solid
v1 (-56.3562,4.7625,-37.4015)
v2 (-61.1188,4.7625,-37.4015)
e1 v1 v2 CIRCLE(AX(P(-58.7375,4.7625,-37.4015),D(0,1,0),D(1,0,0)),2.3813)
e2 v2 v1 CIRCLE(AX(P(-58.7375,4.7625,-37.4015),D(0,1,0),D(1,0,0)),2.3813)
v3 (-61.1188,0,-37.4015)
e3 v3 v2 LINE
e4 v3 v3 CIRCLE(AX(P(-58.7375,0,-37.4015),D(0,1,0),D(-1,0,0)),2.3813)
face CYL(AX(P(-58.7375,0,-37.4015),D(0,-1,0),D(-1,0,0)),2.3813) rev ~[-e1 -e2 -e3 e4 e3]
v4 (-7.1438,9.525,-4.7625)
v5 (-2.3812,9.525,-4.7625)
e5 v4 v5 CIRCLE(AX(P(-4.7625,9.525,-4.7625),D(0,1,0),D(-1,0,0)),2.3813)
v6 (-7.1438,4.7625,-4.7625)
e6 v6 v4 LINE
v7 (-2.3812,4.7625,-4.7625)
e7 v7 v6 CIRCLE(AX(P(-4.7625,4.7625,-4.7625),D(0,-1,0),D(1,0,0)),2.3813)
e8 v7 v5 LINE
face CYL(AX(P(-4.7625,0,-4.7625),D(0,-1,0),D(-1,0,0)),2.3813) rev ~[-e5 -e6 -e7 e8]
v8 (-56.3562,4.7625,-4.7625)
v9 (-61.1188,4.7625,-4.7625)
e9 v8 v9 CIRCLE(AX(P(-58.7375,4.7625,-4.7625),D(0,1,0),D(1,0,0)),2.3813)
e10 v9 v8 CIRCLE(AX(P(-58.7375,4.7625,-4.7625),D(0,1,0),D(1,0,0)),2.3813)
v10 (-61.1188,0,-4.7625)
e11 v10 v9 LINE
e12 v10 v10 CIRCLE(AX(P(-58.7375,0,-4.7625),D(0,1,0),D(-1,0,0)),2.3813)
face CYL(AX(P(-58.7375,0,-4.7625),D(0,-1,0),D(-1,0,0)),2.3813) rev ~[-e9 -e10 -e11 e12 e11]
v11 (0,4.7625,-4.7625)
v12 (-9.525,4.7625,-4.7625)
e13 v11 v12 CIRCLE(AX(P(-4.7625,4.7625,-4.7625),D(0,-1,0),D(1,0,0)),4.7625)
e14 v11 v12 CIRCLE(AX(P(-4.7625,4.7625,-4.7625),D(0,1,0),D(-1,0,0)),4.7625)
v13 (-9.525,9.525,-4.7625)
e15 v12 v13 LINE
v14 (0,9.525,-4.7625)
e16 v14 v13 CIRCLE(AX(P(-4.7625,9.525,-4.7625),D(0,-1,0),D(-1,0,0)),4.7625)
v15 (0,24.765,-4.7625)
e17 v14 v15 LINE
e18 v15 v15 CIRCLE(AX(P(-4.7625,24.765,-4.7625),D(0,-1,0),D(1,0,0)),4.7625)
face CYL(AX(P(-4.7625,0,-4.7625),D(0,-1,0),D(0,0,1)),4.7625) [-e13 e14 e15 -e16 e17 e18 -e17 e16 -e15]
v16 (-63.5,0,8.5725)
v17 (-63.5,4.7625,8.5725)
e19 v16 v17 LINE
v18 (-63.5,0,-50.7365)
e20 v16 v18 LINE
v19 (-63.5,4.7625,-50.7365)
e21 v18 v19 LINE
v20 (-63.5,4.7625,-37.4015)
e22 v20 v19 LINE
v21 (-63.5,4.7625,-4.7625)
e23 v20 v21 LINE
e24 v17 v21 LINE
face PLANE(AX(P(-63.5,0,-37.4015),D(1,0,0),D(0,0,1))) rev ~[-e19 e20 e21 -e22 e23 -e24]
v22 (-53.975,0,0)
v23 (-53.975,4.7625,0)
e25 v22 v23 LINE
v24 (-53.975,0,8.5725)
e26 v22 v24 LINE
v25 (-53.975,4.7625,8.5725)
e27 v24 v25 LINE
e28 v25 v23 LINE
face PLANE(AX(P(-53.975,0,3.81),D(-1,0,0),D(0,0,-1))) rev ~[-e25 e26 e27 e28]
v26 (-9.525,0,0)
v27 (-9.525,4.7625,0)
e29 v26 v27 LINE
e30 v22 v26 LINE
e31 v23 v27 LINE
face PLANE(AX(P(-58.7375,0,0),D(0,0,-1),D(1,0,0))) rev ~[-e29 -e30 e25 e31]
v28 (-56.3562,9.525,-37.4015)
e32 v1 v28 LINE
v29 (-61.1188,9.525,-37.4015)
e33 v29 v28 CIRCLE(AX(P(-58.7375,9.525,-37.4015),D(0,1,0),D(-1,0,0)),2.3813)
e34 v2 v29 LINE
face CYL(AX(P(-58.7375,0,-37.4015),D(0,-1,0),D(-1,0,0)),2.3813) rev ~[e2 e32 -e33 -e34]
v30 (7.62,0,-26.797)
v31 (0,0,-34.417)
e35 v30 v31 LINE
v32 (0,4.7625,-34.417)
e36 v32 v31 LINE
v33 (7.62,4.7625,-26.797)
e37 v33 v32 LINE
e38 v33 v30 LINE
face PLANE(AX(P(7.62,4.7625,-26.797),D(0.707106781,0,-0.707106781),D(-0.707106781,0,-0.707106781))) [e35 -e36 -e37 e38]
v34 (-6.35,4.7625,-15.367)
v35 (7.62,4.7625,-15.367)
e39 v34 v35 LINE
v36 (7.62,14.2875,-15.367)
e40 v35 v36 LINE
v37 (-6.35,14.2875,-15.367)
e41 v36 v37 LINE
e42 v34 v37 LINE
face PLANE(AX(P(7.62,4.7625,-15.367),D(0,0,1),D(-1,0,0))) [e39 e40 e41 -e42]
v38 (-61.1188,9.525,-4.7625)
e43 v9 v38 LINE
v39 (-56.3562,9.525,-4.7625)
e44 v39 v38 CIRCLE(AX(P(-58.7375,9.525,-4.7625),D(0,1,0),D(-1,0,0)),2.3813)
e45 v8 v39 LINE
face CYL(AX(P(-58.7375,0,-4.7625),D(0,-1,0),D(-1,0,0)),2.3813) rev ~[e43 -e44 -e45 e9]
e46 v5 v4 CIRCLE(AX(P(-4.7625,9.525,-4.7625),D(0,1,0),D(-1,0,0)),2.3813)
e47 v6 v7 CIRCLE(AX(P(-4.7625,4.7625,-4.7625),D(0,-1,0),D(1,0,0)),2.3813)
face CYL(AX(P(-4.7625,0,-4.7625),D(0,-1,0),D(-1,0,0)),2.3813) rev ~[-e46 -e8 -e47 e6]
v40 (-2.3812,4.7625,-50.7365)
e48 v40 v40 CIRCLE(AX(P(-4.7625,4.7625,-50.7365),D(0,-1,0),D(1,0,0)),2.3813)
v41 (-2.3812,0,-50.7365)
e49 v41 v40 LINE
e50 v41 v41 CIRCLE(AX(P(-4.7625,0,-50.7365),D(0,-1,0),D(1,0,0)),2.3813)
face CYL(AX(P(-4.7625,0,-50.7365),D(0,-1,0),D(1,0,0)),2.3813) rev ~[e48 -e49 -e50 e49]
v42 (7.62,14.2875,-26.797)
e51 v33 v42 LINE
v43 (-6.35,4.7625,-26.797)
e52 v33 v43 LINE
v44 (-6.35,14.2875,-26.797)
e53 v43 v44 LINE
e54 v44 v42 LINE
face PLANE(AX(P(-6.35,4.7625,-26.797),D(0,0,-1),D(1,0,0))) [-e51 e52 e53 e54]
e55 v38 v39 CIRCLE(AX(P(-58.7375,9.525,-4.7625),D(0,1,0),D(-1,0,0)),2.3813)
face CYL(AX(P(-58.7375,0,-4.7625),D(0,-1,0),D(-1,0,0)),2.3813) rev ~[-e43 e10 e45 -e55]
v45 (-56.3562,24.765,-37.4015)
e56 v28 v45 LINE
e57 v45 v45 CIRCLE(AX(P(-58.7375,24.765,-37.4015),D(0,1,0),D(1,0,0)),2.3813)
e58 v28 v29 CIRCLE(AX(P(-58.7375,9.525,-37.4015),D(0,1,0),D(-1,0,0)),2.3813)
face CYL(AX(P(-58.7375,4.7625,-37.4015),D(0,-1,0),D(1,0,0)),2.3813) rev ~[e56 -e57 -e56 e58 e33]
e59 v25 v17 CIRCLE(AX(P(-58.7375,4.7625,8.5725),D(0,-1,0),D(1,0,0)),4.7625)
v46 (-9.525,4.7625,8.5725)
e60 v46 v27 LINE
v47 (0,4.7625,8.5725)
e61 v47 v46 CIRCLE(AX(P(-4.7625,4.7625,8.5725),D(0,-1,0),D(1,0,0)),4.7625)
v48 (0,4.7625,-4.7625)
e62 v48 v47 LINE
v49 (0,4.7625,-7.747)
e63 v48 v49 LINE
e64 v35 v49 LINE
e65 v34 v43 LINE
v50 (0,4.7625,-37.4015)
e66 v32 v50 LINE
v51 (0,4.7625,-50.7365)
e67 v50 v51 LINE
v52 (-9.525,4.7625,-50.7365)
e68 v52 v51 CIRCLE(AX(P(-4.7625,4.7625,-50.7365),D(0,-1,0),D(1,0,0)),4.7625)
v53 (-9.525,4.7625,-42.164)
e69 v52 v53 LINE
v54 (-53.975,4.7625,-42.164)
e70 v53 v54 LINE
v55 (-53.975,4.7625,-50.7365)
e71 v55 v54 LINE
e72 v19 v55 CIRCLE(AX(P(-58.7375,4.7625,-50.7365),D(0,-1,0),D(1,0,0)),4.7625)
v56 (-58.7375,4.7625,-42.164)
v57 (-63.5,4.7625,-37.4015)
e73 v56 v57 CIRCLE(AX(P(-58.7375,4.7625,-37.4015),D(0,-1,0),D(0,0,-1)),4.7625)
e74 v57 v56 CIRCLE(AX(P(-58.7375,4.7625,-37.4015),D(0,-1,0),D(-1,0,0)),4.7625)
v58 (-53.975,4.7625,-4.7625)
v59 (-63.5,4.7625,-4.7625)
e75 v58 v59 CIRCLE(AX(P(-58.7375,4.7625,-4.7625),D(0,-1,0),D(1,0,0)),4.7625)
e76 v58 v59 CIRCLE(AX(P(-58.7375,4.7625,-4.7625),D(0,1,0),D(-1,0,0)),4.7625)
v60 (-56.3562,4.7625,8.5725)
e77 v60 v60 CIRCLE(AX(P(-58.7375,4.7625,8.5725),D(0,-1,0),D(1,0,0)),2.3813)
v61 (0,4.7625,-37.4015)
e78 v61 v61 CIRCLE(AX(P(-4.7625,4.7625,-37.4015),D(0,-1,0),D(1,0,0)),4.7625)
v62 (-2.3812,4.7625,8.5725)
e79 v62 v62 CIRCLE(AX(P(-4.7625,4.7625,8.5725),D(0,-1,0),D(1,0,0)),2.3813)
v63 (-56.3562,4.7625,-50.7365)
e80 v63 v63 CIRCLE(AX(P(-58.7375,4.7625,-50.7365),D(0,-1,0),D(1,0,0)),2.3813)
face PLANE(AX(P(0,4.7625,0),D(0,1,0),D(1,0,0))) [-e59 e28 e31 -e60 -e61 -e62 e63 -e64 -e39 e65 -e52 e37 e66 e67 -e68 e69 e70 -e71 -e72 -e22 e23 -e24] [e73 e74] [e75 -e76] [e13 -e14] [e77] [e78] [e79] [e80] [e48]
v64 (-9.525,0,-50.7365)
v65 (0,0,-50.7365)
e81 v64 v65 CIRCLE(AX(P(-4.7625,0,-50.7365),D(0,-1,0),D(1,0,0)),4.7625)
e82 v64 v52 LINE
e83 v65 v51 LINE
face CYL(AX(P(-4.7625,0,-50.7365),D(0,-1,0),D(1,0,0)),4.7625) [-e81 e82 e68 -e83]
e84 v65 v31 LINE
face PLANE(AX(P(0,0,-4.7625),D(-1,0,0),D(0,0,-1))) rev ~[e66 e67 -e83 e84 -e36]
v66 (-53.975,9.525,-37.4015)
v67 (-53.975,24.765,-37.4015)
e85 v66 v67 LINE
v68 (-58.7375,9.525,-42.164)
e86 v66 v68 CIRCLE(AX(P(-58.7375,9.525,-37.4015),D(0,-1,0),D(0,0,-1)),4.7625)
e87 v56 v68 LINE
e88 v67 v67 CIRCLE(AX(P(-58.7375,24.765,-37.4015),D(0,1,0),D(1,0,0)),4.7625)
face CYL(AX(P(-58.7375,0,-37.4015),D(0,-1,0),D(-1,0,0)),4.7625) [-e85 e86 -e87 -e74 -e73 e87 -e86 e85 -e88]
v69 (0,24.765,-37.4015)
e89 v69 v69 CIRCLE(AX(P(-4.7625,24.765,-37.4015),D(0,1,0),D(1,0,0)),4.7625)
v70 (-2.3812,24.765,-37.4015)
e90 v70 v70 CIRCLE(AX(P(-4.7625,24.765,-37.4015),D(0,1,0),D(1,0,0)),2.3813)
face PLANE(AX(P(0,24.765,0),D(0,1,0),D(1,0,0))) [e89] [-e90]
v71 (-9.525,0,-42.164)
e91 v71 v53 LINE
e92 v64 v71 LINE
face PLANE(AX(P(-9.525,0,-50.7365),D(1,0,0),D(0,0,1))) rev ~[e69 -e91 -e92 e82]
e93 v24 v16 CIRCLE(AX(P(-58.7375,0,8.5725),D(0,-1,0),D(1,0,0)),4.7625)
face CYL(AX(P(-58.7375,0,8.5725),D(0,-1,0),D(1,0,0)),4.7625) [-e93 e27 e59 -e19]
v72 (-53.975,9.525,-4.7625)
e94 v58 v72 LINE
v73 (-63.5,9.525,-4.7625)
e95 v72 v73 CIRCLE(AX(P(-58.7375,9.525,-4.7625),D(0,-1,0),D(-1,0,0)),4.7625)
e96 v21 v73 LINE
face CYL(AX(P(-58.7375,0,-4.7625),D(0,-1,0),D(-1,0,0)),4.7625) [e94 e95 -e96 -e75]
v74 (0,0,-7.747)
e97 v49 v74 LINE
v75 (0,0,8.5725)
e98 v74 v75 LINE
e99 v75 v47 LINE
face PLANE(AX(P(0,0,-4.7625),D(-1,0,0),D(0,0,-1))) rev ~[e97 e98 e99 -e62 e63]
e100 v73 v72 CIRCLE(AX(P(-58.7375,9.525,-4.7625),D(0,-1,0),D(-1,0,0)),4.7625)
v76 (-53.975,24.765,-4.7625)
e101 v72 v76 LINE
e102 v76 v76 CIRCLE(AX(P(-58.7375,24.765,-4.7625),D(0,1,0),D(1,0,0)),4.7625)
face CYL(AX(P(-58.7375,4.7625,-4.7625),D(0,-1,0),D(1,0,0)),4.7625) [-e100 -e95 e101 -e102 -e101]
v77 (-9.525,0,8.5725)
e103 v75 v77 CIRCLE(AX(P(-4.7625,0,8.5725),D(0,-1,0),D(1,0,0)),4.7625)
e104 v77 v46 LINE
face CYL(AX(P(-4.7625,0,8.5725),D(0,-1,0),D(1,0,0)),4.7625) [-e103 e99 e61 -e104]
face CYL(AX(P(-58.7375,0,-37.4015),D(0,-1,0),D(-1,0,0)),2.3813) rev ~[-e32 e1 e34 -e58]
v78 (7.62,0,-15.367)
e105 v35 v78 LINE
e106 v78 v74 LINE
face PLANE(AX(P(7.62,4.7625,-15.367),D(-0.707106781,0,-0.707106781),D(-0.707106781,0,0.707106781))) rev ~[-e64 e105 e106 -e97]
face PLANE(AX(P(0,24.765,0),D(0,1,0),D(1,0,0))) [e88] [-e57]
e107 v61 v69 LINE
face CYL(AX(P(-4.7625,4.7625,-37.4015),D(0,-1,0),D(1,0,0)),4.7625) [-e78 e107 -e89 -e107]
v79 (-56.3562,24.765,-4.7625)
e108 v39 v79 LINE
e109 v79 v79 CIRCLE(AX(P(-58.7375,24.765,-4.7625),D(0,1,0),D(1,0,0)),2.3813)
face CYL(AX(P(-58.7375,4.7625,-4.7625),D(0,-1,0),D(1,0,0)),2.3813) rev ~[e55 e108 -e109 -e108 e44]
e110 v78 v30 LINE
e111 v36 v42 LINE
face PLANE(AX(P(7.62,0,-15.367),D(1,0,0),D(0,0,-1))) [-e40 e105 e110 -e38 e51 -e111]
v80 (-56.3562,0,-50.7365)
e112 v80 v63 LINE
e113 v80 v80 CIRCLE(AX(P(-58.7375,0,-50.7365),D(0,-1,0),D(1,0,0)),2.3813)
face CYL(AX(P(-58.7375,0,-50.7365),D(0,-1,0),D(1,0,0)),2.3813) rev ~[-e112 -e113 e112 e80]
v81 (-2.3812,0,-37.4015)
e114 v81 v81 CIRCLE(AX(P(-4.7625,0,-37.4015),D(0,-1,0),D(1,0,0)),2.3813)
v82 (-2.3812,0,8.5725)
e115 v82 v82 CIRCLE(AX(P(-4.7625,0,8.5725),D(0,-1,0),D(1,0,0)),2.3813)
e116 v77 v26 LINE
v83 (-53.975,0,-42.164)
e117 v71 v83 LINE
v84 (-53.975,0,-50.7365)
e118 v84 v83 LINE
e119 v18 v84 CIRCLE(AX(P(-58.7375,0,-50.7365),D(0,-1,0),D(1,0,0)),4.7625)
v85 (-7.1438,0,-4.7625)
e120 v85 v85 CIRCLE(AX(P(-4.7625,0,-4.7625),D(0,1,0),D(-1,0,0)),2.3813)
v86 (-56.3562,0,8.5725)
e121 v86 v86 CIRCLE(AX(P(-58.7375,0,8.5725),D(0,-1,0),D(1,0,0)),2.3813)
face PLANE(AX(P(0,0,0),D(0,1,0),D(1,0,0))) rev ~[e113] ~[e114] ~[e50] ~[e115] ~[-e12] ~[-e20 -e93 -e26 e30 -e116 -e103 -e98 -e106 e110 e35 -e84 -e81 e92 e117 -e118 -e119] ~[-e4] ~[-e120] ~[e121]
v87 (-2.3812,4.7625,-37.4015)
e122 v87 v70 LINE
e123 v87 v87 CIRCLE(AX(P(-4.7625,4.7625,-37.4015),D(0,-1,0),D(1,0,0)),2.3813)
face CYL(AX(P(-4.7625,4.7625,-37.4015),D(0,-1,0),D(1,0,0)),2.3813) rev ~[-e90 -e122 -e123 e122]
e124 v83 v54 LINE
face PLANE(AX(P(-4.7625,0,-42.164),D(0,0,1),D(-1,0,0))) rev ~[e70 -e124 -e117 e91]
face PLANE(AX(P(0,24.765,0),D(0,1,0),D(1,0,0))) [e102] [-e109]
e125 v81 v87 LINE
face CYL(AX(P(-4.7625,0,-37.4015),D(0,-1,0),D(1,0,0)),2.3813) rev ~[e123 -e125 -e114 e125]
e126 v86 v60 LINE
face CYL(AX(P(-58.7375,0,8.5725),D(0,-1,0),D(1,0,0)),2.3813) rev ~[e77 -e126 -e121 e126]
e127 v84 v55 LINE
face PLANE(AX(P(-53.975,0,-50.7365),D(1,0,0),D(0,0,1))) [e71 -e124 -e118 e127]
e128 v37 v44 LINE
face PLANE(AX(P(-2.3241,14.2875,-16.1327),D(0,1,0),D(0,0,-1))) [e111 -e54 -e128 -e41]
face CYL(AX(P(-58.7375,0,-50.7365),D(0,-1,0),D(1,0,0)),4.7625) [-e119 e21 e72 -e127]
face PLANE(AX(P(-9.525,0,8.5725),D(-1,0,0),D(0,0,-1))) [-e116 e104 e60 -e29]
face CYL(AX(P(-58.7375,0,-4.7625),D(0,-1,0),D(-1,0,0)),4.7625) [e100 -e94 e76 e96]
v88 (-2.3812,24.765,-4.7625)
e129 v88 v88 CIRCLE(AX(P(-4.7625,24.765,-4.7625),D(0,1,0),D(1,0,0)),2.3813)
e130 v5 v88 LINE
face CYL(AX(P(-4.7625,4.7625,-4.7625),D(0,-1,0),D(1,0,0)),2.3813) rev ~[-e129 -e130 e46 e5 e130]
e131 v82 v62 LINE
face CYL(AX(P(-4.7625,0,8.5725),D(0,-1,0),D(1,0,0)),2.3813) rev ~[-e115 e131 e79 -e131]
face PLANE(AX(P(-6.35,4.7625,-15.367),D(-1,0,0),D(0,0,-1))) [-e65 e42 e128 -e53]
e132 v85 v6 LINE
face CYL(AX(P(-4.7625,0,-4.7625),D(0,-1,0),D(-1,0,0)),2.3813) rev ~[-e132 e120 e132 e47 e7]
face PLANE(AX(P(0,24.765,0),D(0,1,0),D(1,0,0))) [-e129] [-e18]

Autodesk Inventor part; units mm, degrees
ref_plane "YZ Plane" through (0, 0, 0) normal (1, 0, 0) x (0, 1, 0)
ref_plane "XZ Plane" through (0, 0, 0) normal (0, 1, 0) x (-1, 0, 0)
ref_plane "XY Plane" through (0, 0, 0) normal (0, 0, 1) x (1, 0, 0)
sketch "Sketch1" plane through (0, 0, 0) normal (0, 1, 0) x (-1, 0, 0)
  point P0 (0, 0)
sketch "Sketch2" plane through (0, 0, 0) normal (0, 1, 0) x (-1, 0, 0)
  line L0 (0, -4.7625) -> (0, -37.4015)
  line L1 (4.7625, -42.164) -> (58.7375, -42.164)
  line L2 (63.5, -37.4015) -> (63.5, -4.7625)
  line L3 (58.7375, 0) -> (4.7625, 0)
  arc A0 (4.7625, 0) -> (0, -4.7625) centre (4.7625, -4.7625) ccw
  circle A1 centre (4.7625, -4.7625) radius 4.7625
  circle A2 centre (4.7625, -4.7625) radius 2.3813
  arc A3 (0, -37.4015) -> (4.7625, -42.164) centre (4.7625, -37.4015) ccw
  arc A4 (58.7375, -42.164) -> (63.5, -37.4015) centre (58.7375, -37.4015) ccw
  arc A5 (63.5, -4.7625) -> (58.7375, 0) centre (58.7375, -4.7625) ccw
  circle A6 centre (58.7375, -4.7625) radius 4.7625
  circle A7 centre (58.7375, -37.4015) radius 4.7625
  circle A8 centre (58.7375, -4.7625) radius 2.3813
  circle A9 centre (58.7375, -37.4015) radius 2.3813
  point P0 (0, 0)
  point P1 (0, -42.164)
  point P2 (63.5, -42.164)
  point P3 (4.7625, 0)
  point P4 (4.7625, 0)
  dimension "d0" = 42.164
  dimension "d1" = 63.5
  dimension "d2" = 4.7625
  dimension "d3" = 4.7625
  dimension "d4" = 4.7625
  dimension "d5" = 4.7625
  dimension "d6" = 4.7625
extrude "Extrusion1" add sketch "Sketch2" along normal blind 9.525 contours A0 A1 | A5 A6 | A7 A4
extrude "Extrusion2" add sketch "Sketch2" along normal blind 4.7625 contours A1 L3 A6 L2 A7 L1 A3 L0
sketch "Sketch3" plane through (0, 4.7625, 0) normal (0, 1, 0) x (1, 0, 0)
  circle A0 centre (-4.7625, 4.7625) radius 2.3813 projected
  line L0 (-4.7625, 4.7625) -> (-1.3949, 1.3949)
  circle A1 centre (-4.7625, 4.7625) radius 4.7625 projected
  line L1 (-4.7625, 4.7625) -> (0, 4.7625) construction
  circle A2 centre (-4.7625, 4.7625) radius 4.7625
  circle A3 centre (-4.7625, 4.7625) radius 2.3813
  circle A4 centre (-58.7375, 4.7625) radius 4.7625 projected
  circle A5 centre (-58.7375, 4.7625) radius 4.7625
  circle A6 centre (-58.7375, 4.7625) radius 2.3813
  circle A7 centre (-58.7375, 37.4015) radius 2.3813 projected
  circle A8 centre (-58.7375, 37.4015) radius 4.7625
  circle A9 centre (-58.7375, 37.4015) radius 2.3813 projected
  circle A10 centre (-58.7375, 37.4015) radius 2.3813
  point P0 (0, 0)
  dimension "d22" = 45
extrude "Extrusion3" add sketch "Sketch3" along normal blind 20.0025
sketch "Sketch4" plane through (0, 4.7625, 0) normal (0, 1, 0) x (1, 0, 0)
  line L0 (0, 4.7625) -> (0, 37.4015) projected
  line L1 (0, 21.082) -> (0, 26.797)
  line L2 (0, 26.797) -> (0, 21.082)
  line L3 (0, 21.082) -> (0, 15.367)
  line L4 (0, 15.367) -> (7.62, 15.367)
  line L5 (7.62, 15.367) -> (7.62, 26.797)
  line L6 (7.62, 26.797) -> (0, 26.797)
  line L7 (7.62, 26.797) -> (0, 34.417)
  line L8 (7.62, 26.797) -> (18.3963, 26.797) construction
  line L9 (7.62, 15.367) -> (0, 7.747)
  line L10 (7.62, 15.367) -> (18.3963, 15.367) construction
  point P0 (0, 0)
  dimension "d25" = 5.715
  dimension "d26" = 5.715
  dimension "d27" = 7.62
  dimension "d28" = 135
  dimension "d29" = 135
extrude "Extrusion4" add sketch "Sketch4" against normal blind 4.7625
sketch "Sketch5" plane through (0, 4.7625, 0) normal (0, 1, 0) x (1, 0, 0)
  line L0 (7.62, 26.797) -> (7.62, 15.367) projected
  line L1 (7.62, 15.367) -> (-6.35, 15.367)
  line L2 (-6.35, 15.367) -> (-6.35, 26.797)
  line L3 (-6.35, 26.797) -> (7.62, 26.797)
  line L4 (0, 7.747) -> (7.62, 15.367) projected
  line L5 (7.62, 15.367) -> (7.62, 26.797) projected
  line L6 (7.62, 15.367) -> (7.62, 26.797)
  point P0 (0, 0)
  dimension "d32" = 13.97
sketch "Sketch6" plane through (0, 4.7625, 0) normal (0, 1, 0) x (1, 0, 0)
  point P0 (0, 0)
extrude "Extrusion5" add sketch "Sketch5" along normal blind 9.525
sketch "Sketch7" plane through (7.62, 0, -15.367) normal (1, 0, 0) x (0, 0, -1)
  line L0 (0, 4.7625) -> (11.43, 4.7625) projected
  line L1 (5.715, 4.7625) -> (5.715, 17.145)
  circle A0 centre (5.715, 17.145) radius 5.715
  point P0 (-15.367, 0)
  dimension "d35" = 12.3825
  dimension "d36" = 11.43
extrude "Extrusion6" cut sketch "Sketch7" against normal blind 9.9441
sketch "Sketch8" plane through (0, 4.7625, 0) normal (0, 1, 0) x (1, 0, 0)
  line L0 (-58.7375, 0) -> (-4.7625, 0) projected
  line L1 (-31.75, 0) -> (-31.75, 42.164)
  line L2 (-4.7625, 42.164) -> (-58.7375, 42.164) projected
  circle A0 centre (-31.75, 21.082) radius 2.3812
  point P0 (0, 0)
  dimension "d39" = 4.7625
extrude "Extrusion7" cut sketch "Sketch8" against normal blind 9.9441
sketch "Sketch9" plane through (0, 0, 0) normal (0, -1, 0) x (1, 0, 0)
  arc A0 (-4.7625, -42.164) -> (0, -37.4015) centre (-4.7625, -37.4015) ccw projected
  circle A1 centre (-4.7625, -37.4015) radius 2.3813
  circle A2 centre (-4.7625, -4.7625) radius 2.3813 projected
  point P0 (0, 0)
extrude "Extrusion8" cut sketch "Sketch9" against normal up to surface (4.7625 mm away) contours A1
sketch "Sketch10" plane through (0, 4.7625, 0) normal (0, 1, 0) x (1, 0, 0)
  circle A0 centre (-4.7625, 37.4015) radius 2.3813 projected
  circle A1 centre (-4.7625, 37.4015) radius 4.7625
  point P0 (0, 0)
extrude "Extrusion9" add sketch "Sketch10" along normal up to surface (20.0025 mm away)
sketch "Sketch11" plane through (0, 4.7625, 0) normal (0, 1, 0) x (1, 0, 0)
  circle A0 centre (-31.75, 21.082) radius 2.3812 projected
  circle A1 centre (-31.75, 21.082) radius 2.3812
  point P0 (0, 0)
extrude "Extrusion10" add sketch "Sketch11" against normal up to surface (4.7625 mm away)
sketch "Sketch12" plane through (-2.3241, 0, -15.367) normal (1, 0, 0) x (0, 0, -1)
  arc A0 (0.7657, 14.2875) -> (10.6643, 14.2875) centre (5.715, 17.145) ccw projected
  circle A1 centre (5.715, 17.145) radius 5.715
  line L0 (0.7657, 14.2875) -> (10.6643, 14.2875)
  line L1 (11.43, 14.2875) -> (0, 14.2875) projected
  point P0 (-15.367, 0)
extrude "Extrusion11" add sketch "Sketch12" along normal up to surface (9.9441 mm away) contours L0 A0
sketch "Sketch13" plane through (0, 0, 0) normal (0, -1, 0) x (1, 0, 0)
  arc A0 (-58.7375, 0) -> (-63.5, -4.7625) centre (-58.7375, -4.7625) ccw projected
  line L0 (-63.5, -4.7625) -> (-63.5, 0)
  line L1 (-63.5, 0) -> (-63.5, 3.81)
  circle A1 centre (-58.7375, 8.5725) radius 4.7625
  arc A2 (-63.5, -4.7625) -> (-58.7375, 0) centre (-58.7375, -4.7625) ccw projected
  line L2 (-63.5, 3.81) -> (-53.975, 3.81)
  line L3 (-53.975, 3.81) -> (-53.975, 0)
  line L4 (-58.7375, 0) -> (-4.7625, 0) projected
  line L5 (-63.5, 8.5725) -> (-63.5, 3.81)
  circle A3 centre (-58.7375, 8.5725) radius 2.3813
  circle A4 centre (-58.7375, -4.7625) radius 2.3813 projected
  line L6 (-53.975, 8.5725) -> (-53.975, 3.81)
  circle A5 centre (-4.7625, 8.5725) radius 2.3813
  circle A6 centre (-4.7625, 8.5725) radius 4.7625
  circle A7 centre (-4.7625, -4.7625) radius 2.3813 projected
  arc A8 (0, -4.7625) -> (-4.7625, 0) centre (-4.7625, -4.7625) ccw projected
  line L7 (0, -4.7625) -> (0, 8.5725)
  line L8 (-9.525, 8.5725) -> (-9.525, 0)
  circle A9 centre (-58.7375, -50.7365) radius 2.3813
  circle A10 centre (-58.7375, -50.7365) radius 4.7625
  circle A11 centre (-58.7375, -37.4015) radius 2.3813 projected
  arc A12 (-63.5, -37.4015) -> (-58.7375, -42.164) centre (-58.7375, -37.4015) ccw projected
  line L9 (-63.5, -37.4015) -> (-63.5, -50.7365)
  line L10 (-63.5, -37.4015) -> (-63.5, -4.7625) projected
  line L11 (-53.975, -50.7365) -> (-53.975, -42.164)
  line L12 (-4.7625, -42.164) -> (-58.7375, -42.164) projected
  circle A13 centre (-4.7625, -50.7365) radius 2.3813
  circle A14 centre (-4.7625, -50.7365) radius 4.7625
  circle A15 centre (-4.7625, -37.4015) radius 2.3813 projected
  arc A16 (-4.7625, -42.164) -> (0, -37.4015) centre (-4.7625, -37.4015) ccw projected
  line L13 (0, -37.4015) -> (0, -50.7365)
  line L14 (0, -34.417) -> (0, -37.4015) projected
  line L15 (-9.525, -50.7365) -> (-9.525, -42.164)
  point P0 (0, 0)
  point P1 (0, -50.7365)
  point P2 (0, 8.5725)
  dimension "d50" = 3.81
  dimension "d51" = 9.525
  dimension "d52" = 13.335
  dimension "d53" = 13.335
  dimension "d54" = 13.335
  dimension "d55" = 13.335
extrude "Extrusion12" add sketch "Sketch13" against normal up to surface (4.7625 mm away) contours A0 L0 L1 L2 L3 L4 | L2 A1 L6 | L5 A1 L2 | A1 | L8 A6 L7 A8 L4 | A6 | A10 | A10 L9 A12 L12 L11 | A16 L13 A14 L15 L12 | A14
properties part number "MotorBot_3DPrint"
